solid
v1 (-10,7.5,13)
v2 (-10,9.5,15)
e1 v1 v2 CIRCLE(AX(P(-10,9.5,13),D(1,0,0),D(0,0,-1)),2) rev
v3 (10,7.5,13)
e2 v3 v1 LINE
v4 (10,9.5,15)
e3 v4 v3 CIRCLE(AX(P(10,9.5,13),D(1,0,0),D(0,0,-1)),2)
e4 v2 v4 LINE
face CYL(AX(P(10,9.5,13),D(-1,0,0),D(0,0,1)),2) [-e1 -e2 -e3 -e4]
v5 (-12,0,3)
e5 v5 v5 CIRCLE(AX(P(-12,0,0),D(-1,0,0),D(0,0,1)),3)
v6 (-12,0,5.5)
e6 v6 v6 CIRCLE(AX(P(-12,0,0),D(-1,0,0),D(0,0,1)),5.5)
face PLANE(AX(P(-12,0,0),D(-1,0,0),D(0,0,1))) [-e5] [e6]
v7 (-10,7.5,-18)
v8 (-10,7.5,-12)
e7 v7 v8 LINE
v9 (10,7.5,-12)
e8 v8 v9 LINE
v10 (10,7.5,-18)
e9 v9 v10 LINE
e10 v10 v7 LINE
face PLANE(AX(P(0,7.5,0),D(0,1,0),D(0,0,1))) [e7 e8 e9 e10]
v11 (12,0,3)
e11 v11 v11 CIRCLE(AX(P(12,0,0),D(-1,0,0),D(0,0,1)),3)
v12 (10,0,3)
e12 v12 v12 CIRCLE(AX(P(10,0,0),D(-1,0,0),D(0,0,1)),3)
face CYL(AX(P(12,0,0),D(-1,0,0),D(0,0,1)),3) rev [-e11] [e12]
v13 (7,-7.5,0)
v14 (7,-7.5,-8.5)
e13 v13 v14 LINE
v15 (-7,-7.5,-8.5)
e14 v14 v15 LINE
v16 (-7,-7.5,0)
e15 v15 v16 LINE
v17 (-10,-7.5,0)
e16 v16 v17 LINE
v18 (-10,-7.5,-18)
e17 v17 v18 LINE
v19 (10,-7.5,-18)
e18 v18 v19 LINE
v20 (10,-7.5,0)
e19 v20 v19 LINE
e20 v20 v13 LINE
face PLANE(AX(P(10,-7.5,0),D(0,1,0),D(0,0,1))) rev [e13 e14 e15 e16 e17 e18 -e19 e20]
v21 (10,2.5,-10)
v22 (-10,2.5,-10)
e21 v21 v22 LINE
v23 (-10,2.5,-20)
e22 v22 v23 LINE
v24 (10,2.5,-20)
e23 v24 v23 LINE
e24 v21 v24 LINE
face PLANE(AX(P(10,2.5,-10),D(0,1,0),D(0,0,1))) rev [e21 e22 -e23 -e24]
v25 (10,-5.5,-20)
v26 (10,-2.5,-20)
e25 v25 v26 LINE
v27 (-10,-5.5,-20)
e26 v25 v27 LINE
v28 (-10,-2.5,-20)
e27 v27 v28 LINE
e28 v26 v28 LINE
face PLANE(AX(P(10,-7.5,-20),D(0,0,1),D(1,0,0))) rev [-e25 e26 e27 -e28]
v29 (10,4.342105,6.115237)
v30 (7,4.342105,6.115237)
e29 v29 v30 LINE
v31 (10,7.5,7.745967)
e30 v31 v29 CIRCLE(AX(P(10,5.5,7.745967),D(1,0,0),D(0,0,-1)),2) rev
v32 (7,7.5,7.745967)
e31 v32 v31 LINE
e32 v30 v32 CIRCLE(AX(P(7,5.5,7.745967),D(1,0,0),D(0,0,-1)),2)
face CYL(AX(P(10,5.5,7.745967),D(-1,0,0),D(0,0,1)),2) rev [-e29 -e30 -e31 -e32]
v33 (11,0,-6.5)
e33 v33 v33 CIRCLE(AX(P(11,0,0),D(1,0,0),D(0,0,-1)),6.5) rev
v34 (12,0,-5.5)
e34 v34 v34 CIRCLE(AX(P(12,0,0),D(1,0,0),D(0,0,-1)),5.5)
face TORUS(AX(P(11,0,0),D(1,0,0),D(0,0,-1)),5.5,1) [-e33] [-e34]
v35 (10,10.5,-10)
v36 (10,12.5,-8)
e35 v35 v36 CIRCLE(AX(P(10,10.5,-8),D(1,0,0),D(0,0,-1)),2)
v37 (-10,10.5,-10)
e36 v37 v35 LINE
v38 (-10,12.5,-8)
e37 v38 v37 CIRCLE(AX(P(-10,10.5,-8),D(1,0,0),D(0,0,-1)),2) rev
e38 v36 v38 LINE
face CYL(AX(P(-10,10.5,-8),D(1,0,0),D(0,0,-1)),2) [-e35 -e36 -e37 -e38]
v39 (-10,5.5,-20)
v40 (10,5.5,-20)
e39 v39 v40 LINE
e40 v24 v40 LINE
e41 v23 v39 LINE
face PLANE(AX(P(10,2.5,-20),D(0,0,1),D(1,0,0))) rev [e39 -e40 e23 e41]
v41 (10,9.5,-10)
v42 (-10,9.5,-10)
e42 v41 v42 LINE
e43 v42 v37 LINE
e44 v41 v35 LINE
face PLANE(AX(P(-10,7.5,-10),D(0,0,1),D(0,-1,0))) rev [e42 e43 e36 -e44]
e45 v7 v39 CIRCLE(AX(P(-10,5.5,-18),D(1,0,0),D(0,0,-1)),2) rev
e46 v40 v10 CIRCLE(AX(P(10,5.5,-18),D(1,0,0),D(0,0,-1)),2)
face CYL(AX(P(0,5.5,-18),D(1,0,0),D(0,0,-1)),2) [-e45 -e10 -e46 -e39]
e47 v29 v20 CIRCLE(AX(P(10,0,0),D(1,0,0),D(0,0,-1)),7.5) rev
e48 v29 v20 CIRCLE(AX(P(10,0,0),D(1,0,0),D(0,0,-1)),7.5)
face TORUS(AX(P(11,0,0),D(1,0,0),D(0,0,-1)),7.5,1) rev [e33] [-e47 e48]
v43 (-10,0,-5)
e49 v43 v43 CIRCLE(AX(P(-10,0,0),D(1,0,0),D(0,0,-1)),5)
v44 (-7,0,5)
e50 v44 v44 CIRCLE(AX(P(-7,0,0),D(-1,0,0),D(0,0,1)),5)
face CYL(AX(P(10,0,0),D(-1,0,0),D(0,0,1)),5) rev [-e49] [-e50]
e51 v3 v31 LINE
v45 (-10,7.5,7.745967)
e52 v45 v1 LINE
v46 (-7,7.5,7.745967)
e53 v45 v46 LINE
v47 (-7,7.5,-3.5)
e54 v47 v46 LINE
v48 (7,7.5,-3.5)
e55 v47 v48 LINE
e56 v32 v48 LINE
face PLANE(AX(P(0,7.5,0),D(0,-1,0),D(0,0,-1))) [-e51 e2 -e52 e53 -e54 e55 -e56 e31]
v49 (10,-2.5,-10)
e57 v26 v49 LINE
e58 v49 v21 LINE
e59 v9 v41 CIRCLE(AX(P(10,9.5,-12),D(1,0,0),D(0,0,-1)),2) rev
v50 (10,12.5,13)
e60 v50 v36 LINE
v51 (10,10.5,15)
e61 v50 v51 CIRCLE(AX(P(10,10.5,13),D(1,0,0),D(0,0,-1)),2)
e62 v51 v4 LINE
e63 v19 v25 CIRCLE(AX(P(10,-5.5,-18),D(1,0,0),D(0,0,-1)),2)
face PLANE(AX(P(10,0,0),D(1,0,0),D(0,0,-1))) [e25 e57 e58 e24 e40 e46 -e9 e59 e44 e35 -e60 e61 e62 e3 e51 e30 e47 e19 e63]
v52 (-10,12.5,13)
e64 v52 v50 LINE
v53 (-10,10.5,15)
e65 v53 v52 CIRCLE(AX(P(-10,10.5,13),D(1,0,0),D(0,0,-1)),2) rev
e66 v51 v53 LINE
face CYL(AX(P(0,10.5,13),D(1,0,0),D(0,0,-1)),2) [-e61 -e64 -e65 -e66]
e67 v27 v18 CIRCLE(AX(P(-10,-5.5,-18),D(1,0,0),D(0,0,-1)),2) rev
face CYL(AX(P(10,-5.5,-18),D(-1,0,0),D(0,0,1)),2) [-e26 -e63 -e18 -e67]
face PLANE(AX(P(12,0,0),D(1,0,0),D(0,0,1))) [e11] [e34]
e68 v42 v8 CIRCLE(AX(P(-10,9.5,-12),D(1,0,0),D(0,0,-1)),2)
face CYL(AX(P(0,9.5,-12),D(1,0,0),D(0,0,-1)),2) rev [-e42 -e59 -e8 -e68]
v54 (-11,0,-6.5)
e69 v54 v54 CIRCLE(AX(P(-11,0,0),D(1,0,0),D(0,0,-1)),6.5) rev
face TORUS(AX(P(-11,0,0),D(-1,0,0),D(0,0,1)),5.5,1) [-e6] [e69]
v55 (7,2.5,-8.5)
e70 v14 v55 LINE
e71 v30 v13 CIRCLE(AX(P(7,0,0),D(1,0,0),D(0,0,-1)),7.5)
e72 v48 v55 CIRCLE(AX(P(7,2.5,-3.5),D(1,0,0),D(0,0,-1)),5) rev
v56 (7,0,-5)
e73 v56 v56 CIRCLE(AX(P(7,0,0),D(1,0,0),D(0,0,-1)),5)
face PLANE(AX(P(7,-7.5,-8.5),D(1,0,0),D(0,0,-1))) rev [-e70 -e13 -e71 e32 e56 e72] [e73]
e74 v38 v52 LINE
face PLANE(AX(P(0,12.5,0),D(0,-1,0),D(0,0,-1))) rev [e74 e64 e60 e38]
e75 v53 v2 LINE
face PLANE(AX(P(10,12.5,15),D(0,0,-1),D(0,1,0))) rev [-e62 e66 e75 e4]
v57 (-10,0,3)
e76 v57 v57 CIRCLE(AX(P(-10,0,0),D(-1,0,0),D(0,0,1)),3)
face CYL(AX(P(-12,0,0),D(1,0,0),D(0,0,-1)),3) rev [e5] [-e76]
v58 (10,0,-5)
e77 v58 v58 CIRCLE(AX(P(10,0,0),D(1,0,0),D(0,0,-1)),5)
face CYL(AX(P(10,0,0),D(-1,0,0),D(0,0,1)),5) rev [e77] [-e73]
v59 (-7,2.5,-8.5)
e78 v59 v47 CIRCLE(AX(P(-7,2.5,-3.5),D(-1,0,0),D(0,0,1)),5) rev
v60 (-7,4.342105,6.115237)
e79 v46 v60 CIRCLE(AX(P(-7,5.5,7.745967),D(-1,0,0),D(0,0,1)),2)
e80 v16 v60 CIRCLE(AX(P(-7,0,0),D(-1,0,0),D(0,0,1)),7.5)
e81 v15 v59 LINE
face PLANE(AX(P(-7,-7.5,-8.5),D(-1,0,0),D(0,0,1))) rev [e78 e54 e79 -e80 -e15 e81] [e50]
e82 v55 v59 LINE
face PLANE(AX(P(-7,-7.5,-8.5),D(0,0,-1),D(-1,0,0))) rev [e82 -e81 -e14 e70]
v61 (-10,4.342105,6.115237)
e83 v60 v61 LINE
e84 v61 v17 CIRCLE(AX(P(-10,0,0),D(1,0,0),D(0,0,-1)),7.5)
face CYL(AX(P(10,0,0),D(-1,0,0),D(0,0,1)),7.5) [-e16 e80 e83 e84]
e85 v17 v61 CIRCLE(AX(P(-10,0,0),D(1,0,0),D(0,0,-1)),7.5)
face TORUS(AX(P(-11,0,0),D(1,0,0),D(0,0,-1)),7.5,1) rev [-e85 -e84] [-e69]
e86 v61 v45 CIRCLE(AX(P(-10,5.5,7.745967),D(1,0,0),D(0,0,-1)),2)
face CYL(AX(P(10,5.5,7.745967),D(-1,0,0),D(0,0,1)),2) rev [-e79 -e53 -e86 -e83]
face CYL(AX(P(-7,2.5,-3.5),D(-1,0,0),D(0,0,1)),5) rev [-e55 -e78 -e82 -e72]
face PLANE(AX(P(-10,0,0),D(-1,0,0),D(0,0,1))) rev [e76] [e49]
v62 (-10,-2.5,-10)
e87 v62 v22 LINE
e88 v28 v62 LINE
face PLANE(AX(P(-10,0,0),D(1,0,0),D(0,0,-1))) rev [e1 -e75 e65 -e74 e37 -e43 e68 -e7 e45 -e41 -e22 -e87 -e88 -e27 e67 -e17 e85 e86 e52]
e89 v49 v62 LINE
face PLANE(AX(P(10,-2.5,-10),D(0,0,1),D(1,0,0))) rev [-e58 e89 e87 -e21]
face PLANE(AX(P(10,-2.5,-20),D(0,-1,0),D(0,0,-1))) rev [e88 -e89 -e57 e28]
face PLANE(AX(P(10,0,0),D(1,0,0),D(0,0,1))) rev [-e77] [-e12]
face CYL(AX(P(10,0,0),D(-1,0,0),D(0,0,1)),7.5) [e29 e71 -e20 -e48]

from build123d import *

# Parameters (mm, degrees)
SKETCH_1_R               = 5
EXTRUDE_1_DEPTH          = 10
CUT_EXTRUDE_1_DEPTH      = 24.58495283
CUT_EXTRUDE_1_DEPTH_BACK = 24.58495283
SKETCH_2_W               = 14
SKETCH_2_H               = 16
SKETCH_3_W               = 20
SKETCH_3_H               = 35
EXTRUDE_2_DEPTH          = 5
FILLET_3_R               = 2
SKETCH_4_W               = 20
SKETCH_4_H               = 10
CUT_EXTRUDE_2_DEPTH      = 5
FILLET_4_R               = 2
FILLET_5_R               = 5
SKETCH_5_R               = 6.5
SKETCH_5_R_2             = 3
EXTRUDE_3_DEPTH          = 2
FILLET_6_R               = 1


with BuildPart() as part:
    # 草图1 → 凸台-拉伸1 (new, symmetric)
    with BuildSketch(Plane(origin=(0, 0, 0), x_dir=(0, 0, -1), z_dir=(1, 0, 0))):
        with BuildLine():
            Line((20, 7.5), (0, 7.5))
            ThreePointArc((0, 7.5), (-7.5, 0), (0, -7.5))
            Line((0, -7.5), (20, -7.5))
            Line((20, -7.5), (20, -2.5))
            Line((20, -2.5), (10, -2.5))
            Line((10, -2.5), (10, 2.5))
            Line((10, 2.5), (20, 2.5))
            Line((20, 2.5), (20, 7.5))
        make_face()
        Circle(SKETCH_1_R, mode=Mode.SUBTRACT)
    extrude(amount=EXTRUDE_1_DEPTH, both=True)

    # 草图2 → 切除-拉伸1 (cut, two sides: drawn at the far end of the back side and taken through both)
    with BuildSketch(Plane(origin=(0, 0, 0), x_dir=(1, 0, 0), z_dir=(0, 1, 0)).offset(-CUT_EXTRUDE_1_DEPTH_BACK)):
        with Locations((0, 0.5)):
            Rectangle(SKETCH_2_W, SKETCH_2_H)
    extrude(amount=CUT_EXTRUDE_1_DEPTH + CUT_EXTRUDE_1_DEPTH_BACK, mode=Mode.SUBTRACT)

    # 草图3 → 凸台-拉伸2 (add)
    with BuildSketch(Plane(origin=(0, 7.5, 0), x_dir=(1, 0, 0), z_dir=(0, 1, 0))):
        with Locations((0, 2.5)):
            Rectangle(SKETCH_3_W, SKETCH_3_H)
    extrude(amount=EXTRUDE_2_DEPTH)

    # 圆角3
    fillet_3_edges = [part.edges().sort_by_distance(p)[0] for p in [
        (0, -7.5, -20),
        (8.5, 7.5, 0),
        (-8.5, 7.5, 0),
        (0, 7.5, 15),
        (0, 12.5, 15),
    ]]
    fillet(fillet_3_edges, radius=FILLET_3_R)

    # 草图4 → 切除-拉伸2 (cut)
    with BuildSketch(Plane(origin=(0, 12.5, 0), x_dir=(1, 0, 0), z_dir=(0, 1, 0))):
        with Locations((0, 15)):
            Rectangle(SKETCH_4_W, SKETCH_4_H)
    extrude(amount=-CUT_EXTRUDE_2_DEPTH, mode=Mode.SUBTRACT)

    # 圆角4
    fillet_4_edges = [part.edges().sort_by_distance(p)[0] for p in [
        (0, 7.5, -10),
        (0, 7.5, -20),
        (0, 12.5, -10),
    ]]
    fillet(fillet_4_edges, radius=FILLET_4_R)

    # 圆角5
    fillet_5_edges = [part.edges().sort_by_distance(p)[0] for p in [
        (0, 7.5, -8.5),
    ]]
    fillet(fillet_5_edges, radius=FILLET_5_R)

    # 草图5 → 凸台-拉伸3 (add)
    with BuildSketch(Plane.ZY.offset(10)):
        with Locations(Location((0, 0, 0), (0, 0, 180))):
            Circle(SKETCH_5_R)
        Circle(SKETCH_5_R_2, mode=Mode.SUBTRACT)
    extrude_3 = extrude(amount=EXTRUDE_3_DEPTH)

    # 圆角6
    fillet_6_edges = [part.edges().sort_by_distance(p)[0] for p in [
        (-10, 0, 6.5),
        (-12, 0, 6.5),
    ]]
    fillet(fillet_6_edges, radius=FILLET_6_R - 0.0001)  # a hair under: the kernel refuses the full size

    # 镜向1: 凸台-拉伸3 across plane
    add(extrude_3.mirror(Plane(origin=(0, 0, 0), x_dir=(0, 0, 1), z_dir=(1, 0, 0))))

    # 圆角7: read off the stored shape, not the designer's step
    # 圆角7 outline → 圆角7 (revolve, cut)
    with BuildSketch(Plane.YX):
        with BuildLine():
            ThreePointArc((5.5, 12), (6.207106781, 11.707106781), (6.5, 11))
            ThreePointArc((6.5, 11), (6.792893219, 10.292893219), (7.5, 10))
            Line((7.5, 10), (7.5, 12))
            Line((7.5, 12), (5.5, 12))
        make_face()
    revolve(axis=Axis((0, 0, 0), (1, 0, 0)), mode=Mode.SUBTRACT)

    # Fillet 7 2 outline → Fillet 7 2 (revolve)
    with BuildSketch(Plane.YX):
        with BuildLine():
            ThreePointArc((7.5, 10), (6.792893219, 10.292893219), (6.5, 11))
            ThreePointArc((6.5, 11), (6.207106781, 11.707106781), (5.5, 12))
            Line((5.5, 12), (5.5, 10))
            Line((5.5, 10), (7.5, 10))
        make_face()
    revolve(axis=Axis((0, 0, 0), (1, 0, 0)))


solid = part.part
